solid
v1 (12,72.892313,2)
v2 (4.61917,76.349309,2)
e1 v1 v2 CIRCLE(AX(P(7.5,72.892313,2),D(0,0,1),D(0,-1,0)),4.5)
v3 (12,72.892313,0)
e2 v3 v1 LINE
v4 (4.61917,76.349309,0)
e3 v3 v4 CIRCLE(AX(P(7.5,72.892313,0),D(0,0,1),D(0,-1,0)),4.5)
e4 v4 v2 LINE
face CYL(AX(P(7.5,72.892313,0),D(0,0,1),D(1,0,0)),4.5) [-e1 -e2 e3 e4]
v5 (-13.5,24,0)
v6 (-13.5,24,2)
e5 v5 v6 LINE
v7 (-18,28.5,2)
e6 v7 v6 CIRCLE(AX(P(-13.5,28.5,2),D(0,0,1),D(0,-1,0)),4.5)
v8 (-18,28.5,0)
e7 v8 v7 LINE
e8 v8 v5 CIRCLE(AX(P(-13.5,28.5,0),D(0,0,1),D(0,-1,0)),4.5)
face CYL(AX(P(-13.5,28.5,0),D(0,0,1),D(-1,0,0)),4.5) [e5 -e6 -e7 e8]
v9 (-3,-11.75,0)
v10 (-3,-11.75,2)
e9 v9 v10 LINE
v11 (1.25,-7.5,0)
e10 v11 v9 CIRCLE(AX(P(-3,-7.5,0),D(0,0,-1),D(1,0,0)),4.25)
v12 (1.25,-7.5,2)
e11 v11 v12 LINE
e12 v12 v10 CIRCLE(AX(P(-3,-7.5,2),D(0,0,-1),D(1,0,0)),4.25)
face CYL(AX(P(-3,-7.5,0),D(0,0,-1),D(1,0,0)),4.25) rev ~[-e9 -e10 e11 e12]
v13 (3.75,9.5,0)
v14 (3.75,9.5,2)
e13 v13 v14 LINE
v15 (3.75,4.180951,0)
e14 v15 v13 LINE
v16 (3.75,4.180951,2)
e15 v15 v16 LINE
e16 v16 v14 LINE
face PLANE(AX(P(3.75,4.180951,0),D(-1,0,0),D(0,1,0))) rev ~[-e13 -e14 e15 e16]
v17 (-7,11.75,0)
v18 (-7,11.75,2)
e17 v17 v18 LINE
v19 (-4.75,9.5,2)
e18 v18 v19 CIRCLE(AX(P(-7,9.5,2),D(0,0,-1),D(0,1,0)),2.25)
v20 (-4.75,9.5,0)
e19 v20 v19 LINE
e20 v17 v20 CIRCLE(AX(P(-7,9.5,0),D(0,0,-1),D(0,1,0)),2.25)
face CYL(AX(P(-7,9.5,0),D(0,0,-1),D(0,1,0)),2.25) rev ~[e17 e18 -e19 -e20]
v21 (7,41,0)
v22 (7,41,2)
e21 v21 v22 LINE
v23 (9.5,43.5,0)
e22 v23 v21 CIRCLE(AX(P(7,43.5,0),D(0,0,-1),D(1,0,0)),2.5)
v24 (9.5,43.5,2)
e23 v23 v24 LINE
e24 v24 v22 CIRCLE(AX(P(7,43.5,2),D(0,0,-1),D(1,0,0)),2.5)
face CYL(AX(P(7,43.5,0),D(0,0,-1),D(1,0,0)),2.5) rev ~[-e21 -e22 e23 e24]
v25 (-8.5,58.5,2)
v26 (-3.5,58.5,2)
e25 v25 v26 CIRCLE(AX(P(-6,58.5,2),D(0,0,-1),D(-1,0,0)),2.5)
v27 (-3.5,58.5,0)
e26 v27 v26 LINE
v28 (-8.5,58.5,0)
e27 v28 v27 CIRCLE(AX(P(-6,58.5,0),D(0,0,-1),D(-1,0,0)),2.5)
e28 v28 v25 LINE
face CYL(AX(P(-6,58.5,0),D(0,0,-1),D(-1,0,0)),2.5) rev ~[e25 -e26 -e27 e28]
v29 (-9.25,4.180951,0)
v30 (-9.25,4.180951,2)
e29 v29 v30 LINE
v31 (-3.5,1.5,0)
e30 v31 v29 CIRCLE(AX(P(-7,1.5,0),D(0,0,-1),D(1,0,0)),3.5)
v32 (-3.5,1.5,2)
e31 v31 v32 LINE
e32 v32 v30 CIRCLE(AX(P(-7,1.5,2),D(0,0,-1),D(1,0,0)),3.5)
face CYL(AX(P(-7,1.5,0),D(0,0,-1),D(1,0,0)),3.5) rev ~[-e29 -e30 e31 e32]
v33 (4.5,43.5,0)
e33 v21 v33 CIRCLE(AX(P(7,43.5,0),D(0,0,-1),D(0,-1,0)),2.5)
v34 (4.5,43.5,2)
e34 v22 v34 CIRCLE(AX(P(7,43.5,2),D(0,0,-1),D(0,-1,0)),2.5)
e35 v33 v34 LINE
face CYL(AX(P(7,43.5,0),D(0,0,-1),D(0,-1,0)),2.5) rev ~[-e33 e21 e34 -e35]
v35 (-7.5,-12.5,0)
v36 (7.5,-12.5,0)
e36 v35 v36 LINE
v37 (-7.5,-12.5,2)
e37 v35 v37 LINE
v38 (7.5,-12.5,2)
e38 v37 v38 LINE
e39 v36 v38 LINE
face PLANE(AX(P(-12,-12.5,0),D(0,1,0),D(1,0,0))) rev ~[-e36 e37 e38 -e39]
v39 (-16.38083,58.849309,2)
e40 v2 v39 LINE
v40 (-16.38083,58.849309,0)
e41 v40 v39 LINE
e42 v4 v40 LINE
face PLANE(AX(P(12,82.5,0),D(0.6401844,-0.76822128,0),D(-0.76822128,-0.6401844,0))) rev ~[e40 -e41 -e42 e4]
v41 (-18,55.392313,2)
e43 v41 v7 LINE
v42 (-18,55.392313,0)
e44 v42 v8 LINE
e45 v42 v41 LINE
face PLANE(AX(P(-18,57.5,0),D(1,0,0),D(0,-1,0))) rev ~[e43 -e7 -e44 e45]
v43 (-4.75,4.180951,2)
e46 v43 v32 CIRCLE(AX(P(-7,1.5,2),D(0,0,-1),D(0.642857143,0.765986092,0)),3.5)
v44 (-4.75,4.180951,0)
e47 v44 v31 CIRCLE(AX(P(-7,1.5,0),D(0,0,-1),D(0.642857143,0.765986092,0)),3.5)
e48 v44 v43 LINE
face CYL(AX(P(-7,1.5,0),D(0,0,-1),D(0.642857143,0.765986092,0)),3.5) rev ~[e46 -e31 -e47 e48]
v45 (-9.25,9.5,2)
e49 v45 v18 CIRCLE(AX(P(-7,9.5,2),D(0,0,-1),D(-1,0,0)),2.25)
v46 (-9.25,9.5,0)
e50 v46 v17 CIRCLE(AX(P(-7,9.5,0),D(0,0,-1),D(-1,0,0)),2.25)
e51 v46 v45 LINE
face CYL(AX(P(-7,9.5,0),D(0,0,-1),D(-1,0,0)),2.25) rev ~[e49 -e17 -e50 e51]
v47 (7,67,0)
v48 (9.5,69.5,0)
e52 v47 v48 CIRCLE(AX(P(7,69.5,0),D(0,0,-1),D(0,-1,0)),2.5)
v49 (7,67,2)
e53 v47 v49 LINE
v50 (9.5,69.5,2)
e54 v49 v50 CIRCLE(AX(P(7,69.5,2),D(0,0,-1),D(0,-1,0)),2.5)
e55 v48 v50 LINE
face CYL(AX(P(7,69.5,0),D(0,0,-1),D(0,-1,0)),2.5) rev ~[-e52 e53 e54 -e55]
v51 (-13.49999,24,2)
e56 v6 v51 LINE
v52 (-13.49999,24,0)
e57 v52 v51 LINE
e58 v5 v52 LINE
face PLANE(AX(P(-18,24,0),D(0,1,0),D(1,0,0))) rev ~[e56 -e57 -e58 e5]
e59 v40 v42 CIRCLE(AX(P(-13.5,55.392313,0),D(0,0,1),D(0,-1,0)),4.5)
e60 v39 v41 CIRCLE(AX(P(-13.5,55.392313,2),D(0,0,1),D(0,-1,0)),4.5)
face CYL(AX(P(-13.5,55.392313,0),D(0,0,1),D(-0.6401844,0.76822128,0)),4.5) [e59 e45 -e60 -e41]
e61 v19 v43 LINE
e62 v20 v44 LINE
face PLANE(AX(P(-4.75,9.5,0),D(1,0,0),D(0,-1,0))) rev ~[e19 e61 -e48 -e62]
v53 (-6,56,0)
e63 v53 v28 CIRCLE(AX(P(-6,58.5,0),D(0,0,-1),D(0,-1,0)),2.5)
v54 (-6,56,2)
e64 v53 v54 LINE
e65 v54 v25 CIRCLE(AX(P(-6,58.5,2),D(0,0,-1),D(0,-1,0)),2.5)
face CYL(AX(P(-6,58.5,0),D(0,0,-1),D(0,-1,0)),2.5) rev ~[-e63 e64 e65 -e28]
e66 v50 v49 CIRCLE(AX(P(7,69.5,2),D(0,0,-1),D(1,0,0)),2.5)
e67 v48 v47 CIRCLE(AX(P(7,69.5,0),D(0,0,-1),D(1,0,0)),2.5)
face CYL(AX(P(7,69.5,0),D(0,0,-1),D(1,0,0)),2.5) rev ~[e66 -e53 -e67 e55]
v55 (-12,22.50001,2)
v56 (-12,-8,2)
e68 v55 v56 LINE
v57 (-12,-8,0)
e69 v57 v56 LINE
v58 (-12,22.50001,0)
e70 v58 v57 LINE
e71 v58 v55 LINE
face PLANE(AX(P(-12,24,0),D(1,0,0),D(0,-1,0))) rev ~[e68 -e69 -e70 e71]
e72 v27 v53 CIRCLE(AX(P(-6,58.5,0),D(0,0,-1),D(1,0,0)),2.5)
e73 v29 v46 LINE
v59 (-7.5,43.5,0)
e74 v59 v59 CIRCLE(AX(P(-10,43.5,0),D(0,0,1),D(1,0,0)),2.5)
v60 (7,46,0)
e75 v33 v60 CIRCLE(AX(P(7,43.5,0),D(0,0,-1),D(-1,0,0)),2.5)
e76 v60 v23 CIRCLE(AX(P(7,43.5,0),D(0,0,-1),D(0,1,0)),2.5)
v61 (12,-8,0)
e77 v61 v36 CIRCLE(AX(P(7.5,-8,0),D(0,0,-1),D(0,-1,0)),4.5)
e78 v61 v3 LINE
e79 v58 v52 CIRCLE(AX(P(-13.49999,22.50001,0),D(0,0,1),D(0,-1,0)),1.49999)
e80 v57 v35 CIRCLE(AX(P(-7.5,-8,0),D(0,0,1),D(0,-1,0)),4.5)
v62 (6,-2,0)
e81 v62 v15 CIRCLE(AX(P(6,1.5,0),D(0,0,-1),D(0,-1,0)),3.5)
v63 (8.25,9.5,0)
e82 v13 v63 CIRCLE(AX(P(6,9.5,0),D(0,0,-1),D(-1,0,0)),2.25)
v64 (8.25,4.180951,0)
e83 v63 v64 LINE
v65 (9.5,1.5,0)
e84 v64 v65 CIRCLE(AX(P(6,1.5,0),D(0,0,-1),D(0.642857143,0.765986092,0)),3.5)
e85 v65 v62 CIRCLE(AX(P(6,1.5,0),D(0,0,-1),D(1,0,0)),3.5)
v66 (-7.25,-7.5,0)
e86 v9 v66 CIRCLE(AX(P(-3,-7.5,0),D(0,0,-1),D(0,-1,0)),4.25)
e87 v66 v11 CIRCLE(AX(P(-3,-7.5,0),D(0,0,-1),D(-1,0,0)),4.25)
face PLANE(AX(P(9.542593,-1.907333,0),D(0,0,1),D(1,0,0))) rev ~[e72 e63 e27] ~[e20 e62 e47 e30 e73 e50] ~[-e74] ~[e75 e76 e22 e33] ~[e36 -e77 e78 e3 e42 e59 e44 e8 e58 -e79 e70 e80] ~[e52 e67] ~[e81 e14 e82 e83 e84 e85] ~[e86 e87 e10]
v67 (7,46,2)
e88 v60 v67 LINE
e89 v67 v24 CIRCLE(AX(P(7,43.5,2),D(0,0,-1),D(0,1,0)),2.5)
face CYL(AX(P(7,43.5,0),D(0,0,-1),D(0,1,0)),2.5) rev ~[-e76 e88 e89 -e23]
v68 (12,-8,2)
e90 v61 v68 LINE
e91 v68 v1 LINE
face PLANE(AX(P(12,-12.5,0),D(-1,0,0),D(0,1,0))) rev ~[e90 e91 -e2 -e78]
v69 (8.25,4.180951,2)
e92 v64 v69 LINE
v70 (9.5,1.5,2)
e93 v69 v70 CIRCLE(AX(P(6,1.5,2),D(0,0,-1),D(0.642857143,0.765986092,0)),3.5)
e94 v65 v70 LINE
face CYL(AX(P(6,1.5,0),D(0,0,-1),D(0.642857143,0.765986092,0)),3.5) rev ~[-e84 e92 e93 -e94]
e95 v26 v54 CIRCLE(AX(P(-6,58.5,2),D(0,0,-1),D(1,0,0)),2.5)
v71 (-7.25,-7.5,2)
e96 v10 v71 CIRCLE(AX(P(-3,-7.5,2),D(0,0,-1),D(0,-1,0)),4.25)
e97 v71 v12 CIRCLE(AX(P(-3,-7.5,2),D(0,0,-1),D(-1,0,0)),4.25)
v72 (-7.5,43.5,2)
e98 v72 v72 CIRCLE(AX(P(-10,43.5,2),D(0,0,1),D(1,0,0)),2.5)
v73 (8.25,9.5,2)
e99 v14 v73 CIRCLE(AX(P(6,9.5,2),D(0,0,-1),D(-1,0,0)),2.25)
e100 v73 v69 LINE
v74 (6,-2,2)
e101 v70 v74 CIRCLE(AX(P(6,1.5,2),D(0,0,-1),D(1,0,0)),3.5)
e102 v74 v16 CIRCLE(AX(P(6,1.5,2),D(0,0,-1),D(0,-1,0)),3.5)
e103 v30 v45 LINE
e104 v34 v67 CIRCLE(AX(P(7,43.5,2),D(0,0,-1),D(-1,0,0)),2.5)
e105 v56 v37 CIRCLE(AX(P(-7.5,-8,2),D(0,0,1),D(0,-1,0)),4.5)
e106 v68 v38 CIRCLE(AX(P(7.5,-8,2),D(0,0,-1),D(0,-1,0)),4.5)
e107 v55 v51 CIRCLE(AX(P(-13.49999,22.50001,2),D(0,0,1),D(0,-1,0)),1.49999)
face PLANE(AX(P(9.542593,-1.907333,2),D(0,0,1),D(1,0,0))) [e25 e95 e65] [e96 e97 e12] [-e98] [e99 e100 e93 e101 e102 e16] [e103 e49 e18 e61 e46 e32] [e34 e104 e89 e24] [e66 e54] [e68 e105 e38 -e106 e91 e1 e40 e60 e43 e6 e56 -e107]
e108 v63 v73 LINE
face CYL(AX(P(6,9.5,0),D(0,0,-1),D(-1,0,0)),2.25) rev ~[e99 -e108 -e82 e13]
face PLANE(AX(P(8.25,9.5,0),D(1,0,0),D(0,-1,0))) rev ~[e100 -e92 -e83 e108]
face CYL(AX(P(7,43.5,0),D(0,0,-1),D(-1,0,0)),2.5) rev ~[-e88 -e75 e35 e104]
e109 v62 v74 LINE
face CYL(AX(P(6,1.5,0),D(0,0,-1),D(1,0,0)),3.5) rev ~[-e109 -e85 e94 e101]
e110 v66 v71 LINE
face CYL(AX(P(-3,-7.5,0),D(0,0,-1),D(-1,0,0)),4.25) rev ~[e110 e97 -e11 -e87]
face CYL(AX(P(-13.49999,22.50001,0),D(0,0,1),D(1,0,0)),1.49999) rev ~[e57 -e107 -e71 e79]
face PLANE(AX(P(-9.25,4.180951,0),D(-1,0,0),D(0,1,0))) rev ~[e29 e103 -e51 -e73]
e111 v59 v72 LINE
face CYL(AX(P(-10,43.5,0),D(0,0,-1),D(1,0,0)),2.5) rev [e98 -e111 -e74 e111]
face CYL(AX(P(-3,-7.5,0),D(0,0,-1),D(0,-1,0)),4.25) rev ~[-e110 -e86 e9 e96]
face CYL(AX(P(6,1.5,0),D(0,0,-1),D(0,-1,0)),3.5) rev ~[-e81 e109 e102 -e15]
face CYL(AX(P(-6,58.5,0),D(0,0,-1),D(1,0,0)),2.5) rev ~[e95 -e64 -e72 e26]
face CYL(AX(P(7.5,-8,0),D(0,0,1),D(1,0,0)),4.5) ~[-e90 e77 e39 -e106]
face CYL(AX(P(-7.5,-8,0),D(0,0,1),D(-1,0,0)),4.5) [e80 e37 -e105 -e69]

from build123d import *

# Parameters (mm, degrees)
F0_R     = 2.5
F1_DEPTH = 2
F2_R     = 4.5
F3_R     = 1.49999


# Not quite as in the source:
# - a fillet or chamfer is up to 0.001 mm smaller than in the source, because OpenCascade refuses the exact size


with BuildPart() as f1:
    # F0 (on Top) → F1 (new body)
    with BuildSketch(Plane.XY):
        with BuildLine():
            Line((6, -12.5), (12, -12.5))
            Line((12, -12.5), (12, 9.5))
            Line((12, 9.5), (8.25, 9.5))
            Line((8.25, 9.5), (8.25, 4.1809513237))
            ThreePointArc((8.25, 4.1809513237), (9.1721443851, 2.9790199458), (9.5, 1.5))
            ThreePointArc((9.5, 1.5), (8.4748737342, -0.9748737342), (6, -2))
            Line((6, -2), (6, -12.5))
        make_face()
        with BuildLine():
            Line((8.25, 9.5), (12, 9.5))
            Line((12, 9.5), (12, 12.5))
            Line((12, 12.5), (-7, 12.5))
            Line((-7, 12.5), (-7, 11.75))
            ThreePointArc((-7, 11.75), (-5.4090097423, 11.0909902577), (-4.75, 9.5))
            Line((-4.75, 9.5), (-4.75, 4.1809513237))
            ThreePointArc((-4.75, 4.1809513237), (-3.8278556149, 2.9790199458), (-3.5, 1.5))
            ThreePointArc((-3.5, 1.5), (-8.4790199458, -1.6721443851), (-9.25, 4.1809513237))
            Line((-9.25, 4.1809513237), (-9.25, 9.5))
            Line((-9.25, 9.5), (-12, 9.5))
            Line((-12, 9.5), (-12, -7.5))
            Line((-12, -7.5), (-7.25, -7.5))
            ThreePointArc((-7.25, -7.5), (-3, -3.25), (1.25, -7.5))
            ThreePointArc((1.25, -7.5), (0.00520382, -10.50520382), (-3, -11.75))
            Line((-3, -11.75), (-3, -12.5))
            Line((-3, -12.5), (6, -12.5))
            Line((6, -12.5), (6, -2))
            ThreePointArc((6, -2), (2.7111301612, 0.3027802276), (3.75, 4.1809513237))
            Line((3.75, 4.1809513237), (3.75, 9.5))
            ThreePointArc((3.75, 9.5), (6, 11.75), (8.25, 9.5))
        make_face()
        Polygon((-7, 12.5), (12, 12.5), (12, 22.5), (7, 22.5), (-6, 22.5), (-12, 22.5), (-12, 12.5), align=None)
        with BuildLine():
            Line((-12, -12.5), (-3, -12.5))
            Line((-3, -12.5), (-3, -11.75))
            ThreePointArc((-3, -11.75), (-6.00520382, -10.50520382), (-7.25, -7.5))
            Line((-7.25, -7.5), (-12, -7.5))
            Line((-12, -7.5), (-12, -12.5))
        make_face()
        with BuildLine():
            Line((-7, 11.75), (-7, 12.5))
            Line((-7, 12.5), (-12, 12.5))
            Line((-12, 12.5), (-12, 9.5))
            Line((-12, 9.5), (-9.25, 9.5))
            ThreePointArc((-9.25, 9.5), (-8.5909902577, 11.0909902577), (-7, 11.75))
        make_face()
        with BuildLine():
            Line((7, 22.5), (12, 22.5))
            Line((12, 22.5), (12, 43.5))
            Line((12, 43.5), (9.5, 43.5))
            ThreePointArc((9.5, 43.5), (8.767766953, 41.732233047), (7, 41))
            Line((7, 41), (7, 22.5))
        make_face()
        with BuildLine():
            Line((-6, 22.5), (7, 22.5))
            Line((7, 22.5), (7, 41))
            ThreePointArc((7, 41), (5.232233047, 41.732233047), (4.5, 43.5))
            Line((4.5, 43.5), (-6, 43.5))
            Line((-6, 43.5), (-6, 22.5))
        make_face()
        with BuildLine():
            Line((9.5, 43.5), (12, 43.5))
            Line((12, 43.5), (12, 72.5))
            Line((12, 72.5), (0, 72.5))
            Line((0, 72.5), (-16.8, 58.5))
            Line((-16.8, 58.5), (-8.5, 58.5))
            ThreePointArc((-8.5, 58.5), (-6, 61), (-3.5, 58.5))
            ThreePointArc((-3.5, 58.5), (-4.232233047, 56.732233047), (-6, 56))
            Line((-6, 56), (-6, 43.5))
            Line((-6, 43.5), (4.5, 43.5))
            ThreePointArc((4.5, 43.5), (5.232233047, 45.267766953), (7, 46))
            ThreePointArc((7, 46), (8.767766953, 45.267766953), (9.5, 43.5))
        make_face()
        with BuildLine():
            ThreePointArc((9.5, 69.5), (8.767766953, 67.732233047), (7, 67))
            ThreePointArc((7, 67), (5.232233047, 71.267766953), (9.5, 69.5))
        make_face(mode=Mode.SUBTRACT)
        with BuildLine():
            Line((-12, 24), (-12, 22.5))
            Line((-12, 22.5), (-6, 22.5))
            Line((-6, 22.5), (-6, 43.5))
            Line((-6, 43.5), (-6, 56))
            ThreePointArc((-6, 56), (-7.767766953, 56.732233047), (-8.5, 58.5))
            Line((-8.5, 58.5), (-16.8, 58.5))
            Line((-16.8, 58.5), (-18, 57.5))
            Line((-18, 57.5), (-18, 24))
            Line((-18, 24), (-12, 24))
        make_face()
        with Locations((-10, 43.5)):
            Circle(F0_R, mode=Mode.SUBTRACT)
        Polygon((0, 72.5), (12, 72.5), (12, 82.5), align=None)
    extrude(amount=F1_DEPTH)

    # F2
    f2_edges = [f1.edges().sort_by_distance(p)[0] for p in [
        (12, 82.5, 1),
        (-18, 57.5, 1),
        (-12, -12.5, 1),
        (12, -12.5, 1),
        (-18, 24, 1),
    ]]
    fillet(f2_edges, radius=F2_R)

    # F3 (radius 1.5 in the source; OpenCascade refuses exactly that, so slightly less here)
    f3_edges = [f1.edges().sort_by_distance(p)[0] for p in [
        (-12, 24, 1),
    ]]
    fillet(f3_edges, radius=F3_R)


solid = f1.part
